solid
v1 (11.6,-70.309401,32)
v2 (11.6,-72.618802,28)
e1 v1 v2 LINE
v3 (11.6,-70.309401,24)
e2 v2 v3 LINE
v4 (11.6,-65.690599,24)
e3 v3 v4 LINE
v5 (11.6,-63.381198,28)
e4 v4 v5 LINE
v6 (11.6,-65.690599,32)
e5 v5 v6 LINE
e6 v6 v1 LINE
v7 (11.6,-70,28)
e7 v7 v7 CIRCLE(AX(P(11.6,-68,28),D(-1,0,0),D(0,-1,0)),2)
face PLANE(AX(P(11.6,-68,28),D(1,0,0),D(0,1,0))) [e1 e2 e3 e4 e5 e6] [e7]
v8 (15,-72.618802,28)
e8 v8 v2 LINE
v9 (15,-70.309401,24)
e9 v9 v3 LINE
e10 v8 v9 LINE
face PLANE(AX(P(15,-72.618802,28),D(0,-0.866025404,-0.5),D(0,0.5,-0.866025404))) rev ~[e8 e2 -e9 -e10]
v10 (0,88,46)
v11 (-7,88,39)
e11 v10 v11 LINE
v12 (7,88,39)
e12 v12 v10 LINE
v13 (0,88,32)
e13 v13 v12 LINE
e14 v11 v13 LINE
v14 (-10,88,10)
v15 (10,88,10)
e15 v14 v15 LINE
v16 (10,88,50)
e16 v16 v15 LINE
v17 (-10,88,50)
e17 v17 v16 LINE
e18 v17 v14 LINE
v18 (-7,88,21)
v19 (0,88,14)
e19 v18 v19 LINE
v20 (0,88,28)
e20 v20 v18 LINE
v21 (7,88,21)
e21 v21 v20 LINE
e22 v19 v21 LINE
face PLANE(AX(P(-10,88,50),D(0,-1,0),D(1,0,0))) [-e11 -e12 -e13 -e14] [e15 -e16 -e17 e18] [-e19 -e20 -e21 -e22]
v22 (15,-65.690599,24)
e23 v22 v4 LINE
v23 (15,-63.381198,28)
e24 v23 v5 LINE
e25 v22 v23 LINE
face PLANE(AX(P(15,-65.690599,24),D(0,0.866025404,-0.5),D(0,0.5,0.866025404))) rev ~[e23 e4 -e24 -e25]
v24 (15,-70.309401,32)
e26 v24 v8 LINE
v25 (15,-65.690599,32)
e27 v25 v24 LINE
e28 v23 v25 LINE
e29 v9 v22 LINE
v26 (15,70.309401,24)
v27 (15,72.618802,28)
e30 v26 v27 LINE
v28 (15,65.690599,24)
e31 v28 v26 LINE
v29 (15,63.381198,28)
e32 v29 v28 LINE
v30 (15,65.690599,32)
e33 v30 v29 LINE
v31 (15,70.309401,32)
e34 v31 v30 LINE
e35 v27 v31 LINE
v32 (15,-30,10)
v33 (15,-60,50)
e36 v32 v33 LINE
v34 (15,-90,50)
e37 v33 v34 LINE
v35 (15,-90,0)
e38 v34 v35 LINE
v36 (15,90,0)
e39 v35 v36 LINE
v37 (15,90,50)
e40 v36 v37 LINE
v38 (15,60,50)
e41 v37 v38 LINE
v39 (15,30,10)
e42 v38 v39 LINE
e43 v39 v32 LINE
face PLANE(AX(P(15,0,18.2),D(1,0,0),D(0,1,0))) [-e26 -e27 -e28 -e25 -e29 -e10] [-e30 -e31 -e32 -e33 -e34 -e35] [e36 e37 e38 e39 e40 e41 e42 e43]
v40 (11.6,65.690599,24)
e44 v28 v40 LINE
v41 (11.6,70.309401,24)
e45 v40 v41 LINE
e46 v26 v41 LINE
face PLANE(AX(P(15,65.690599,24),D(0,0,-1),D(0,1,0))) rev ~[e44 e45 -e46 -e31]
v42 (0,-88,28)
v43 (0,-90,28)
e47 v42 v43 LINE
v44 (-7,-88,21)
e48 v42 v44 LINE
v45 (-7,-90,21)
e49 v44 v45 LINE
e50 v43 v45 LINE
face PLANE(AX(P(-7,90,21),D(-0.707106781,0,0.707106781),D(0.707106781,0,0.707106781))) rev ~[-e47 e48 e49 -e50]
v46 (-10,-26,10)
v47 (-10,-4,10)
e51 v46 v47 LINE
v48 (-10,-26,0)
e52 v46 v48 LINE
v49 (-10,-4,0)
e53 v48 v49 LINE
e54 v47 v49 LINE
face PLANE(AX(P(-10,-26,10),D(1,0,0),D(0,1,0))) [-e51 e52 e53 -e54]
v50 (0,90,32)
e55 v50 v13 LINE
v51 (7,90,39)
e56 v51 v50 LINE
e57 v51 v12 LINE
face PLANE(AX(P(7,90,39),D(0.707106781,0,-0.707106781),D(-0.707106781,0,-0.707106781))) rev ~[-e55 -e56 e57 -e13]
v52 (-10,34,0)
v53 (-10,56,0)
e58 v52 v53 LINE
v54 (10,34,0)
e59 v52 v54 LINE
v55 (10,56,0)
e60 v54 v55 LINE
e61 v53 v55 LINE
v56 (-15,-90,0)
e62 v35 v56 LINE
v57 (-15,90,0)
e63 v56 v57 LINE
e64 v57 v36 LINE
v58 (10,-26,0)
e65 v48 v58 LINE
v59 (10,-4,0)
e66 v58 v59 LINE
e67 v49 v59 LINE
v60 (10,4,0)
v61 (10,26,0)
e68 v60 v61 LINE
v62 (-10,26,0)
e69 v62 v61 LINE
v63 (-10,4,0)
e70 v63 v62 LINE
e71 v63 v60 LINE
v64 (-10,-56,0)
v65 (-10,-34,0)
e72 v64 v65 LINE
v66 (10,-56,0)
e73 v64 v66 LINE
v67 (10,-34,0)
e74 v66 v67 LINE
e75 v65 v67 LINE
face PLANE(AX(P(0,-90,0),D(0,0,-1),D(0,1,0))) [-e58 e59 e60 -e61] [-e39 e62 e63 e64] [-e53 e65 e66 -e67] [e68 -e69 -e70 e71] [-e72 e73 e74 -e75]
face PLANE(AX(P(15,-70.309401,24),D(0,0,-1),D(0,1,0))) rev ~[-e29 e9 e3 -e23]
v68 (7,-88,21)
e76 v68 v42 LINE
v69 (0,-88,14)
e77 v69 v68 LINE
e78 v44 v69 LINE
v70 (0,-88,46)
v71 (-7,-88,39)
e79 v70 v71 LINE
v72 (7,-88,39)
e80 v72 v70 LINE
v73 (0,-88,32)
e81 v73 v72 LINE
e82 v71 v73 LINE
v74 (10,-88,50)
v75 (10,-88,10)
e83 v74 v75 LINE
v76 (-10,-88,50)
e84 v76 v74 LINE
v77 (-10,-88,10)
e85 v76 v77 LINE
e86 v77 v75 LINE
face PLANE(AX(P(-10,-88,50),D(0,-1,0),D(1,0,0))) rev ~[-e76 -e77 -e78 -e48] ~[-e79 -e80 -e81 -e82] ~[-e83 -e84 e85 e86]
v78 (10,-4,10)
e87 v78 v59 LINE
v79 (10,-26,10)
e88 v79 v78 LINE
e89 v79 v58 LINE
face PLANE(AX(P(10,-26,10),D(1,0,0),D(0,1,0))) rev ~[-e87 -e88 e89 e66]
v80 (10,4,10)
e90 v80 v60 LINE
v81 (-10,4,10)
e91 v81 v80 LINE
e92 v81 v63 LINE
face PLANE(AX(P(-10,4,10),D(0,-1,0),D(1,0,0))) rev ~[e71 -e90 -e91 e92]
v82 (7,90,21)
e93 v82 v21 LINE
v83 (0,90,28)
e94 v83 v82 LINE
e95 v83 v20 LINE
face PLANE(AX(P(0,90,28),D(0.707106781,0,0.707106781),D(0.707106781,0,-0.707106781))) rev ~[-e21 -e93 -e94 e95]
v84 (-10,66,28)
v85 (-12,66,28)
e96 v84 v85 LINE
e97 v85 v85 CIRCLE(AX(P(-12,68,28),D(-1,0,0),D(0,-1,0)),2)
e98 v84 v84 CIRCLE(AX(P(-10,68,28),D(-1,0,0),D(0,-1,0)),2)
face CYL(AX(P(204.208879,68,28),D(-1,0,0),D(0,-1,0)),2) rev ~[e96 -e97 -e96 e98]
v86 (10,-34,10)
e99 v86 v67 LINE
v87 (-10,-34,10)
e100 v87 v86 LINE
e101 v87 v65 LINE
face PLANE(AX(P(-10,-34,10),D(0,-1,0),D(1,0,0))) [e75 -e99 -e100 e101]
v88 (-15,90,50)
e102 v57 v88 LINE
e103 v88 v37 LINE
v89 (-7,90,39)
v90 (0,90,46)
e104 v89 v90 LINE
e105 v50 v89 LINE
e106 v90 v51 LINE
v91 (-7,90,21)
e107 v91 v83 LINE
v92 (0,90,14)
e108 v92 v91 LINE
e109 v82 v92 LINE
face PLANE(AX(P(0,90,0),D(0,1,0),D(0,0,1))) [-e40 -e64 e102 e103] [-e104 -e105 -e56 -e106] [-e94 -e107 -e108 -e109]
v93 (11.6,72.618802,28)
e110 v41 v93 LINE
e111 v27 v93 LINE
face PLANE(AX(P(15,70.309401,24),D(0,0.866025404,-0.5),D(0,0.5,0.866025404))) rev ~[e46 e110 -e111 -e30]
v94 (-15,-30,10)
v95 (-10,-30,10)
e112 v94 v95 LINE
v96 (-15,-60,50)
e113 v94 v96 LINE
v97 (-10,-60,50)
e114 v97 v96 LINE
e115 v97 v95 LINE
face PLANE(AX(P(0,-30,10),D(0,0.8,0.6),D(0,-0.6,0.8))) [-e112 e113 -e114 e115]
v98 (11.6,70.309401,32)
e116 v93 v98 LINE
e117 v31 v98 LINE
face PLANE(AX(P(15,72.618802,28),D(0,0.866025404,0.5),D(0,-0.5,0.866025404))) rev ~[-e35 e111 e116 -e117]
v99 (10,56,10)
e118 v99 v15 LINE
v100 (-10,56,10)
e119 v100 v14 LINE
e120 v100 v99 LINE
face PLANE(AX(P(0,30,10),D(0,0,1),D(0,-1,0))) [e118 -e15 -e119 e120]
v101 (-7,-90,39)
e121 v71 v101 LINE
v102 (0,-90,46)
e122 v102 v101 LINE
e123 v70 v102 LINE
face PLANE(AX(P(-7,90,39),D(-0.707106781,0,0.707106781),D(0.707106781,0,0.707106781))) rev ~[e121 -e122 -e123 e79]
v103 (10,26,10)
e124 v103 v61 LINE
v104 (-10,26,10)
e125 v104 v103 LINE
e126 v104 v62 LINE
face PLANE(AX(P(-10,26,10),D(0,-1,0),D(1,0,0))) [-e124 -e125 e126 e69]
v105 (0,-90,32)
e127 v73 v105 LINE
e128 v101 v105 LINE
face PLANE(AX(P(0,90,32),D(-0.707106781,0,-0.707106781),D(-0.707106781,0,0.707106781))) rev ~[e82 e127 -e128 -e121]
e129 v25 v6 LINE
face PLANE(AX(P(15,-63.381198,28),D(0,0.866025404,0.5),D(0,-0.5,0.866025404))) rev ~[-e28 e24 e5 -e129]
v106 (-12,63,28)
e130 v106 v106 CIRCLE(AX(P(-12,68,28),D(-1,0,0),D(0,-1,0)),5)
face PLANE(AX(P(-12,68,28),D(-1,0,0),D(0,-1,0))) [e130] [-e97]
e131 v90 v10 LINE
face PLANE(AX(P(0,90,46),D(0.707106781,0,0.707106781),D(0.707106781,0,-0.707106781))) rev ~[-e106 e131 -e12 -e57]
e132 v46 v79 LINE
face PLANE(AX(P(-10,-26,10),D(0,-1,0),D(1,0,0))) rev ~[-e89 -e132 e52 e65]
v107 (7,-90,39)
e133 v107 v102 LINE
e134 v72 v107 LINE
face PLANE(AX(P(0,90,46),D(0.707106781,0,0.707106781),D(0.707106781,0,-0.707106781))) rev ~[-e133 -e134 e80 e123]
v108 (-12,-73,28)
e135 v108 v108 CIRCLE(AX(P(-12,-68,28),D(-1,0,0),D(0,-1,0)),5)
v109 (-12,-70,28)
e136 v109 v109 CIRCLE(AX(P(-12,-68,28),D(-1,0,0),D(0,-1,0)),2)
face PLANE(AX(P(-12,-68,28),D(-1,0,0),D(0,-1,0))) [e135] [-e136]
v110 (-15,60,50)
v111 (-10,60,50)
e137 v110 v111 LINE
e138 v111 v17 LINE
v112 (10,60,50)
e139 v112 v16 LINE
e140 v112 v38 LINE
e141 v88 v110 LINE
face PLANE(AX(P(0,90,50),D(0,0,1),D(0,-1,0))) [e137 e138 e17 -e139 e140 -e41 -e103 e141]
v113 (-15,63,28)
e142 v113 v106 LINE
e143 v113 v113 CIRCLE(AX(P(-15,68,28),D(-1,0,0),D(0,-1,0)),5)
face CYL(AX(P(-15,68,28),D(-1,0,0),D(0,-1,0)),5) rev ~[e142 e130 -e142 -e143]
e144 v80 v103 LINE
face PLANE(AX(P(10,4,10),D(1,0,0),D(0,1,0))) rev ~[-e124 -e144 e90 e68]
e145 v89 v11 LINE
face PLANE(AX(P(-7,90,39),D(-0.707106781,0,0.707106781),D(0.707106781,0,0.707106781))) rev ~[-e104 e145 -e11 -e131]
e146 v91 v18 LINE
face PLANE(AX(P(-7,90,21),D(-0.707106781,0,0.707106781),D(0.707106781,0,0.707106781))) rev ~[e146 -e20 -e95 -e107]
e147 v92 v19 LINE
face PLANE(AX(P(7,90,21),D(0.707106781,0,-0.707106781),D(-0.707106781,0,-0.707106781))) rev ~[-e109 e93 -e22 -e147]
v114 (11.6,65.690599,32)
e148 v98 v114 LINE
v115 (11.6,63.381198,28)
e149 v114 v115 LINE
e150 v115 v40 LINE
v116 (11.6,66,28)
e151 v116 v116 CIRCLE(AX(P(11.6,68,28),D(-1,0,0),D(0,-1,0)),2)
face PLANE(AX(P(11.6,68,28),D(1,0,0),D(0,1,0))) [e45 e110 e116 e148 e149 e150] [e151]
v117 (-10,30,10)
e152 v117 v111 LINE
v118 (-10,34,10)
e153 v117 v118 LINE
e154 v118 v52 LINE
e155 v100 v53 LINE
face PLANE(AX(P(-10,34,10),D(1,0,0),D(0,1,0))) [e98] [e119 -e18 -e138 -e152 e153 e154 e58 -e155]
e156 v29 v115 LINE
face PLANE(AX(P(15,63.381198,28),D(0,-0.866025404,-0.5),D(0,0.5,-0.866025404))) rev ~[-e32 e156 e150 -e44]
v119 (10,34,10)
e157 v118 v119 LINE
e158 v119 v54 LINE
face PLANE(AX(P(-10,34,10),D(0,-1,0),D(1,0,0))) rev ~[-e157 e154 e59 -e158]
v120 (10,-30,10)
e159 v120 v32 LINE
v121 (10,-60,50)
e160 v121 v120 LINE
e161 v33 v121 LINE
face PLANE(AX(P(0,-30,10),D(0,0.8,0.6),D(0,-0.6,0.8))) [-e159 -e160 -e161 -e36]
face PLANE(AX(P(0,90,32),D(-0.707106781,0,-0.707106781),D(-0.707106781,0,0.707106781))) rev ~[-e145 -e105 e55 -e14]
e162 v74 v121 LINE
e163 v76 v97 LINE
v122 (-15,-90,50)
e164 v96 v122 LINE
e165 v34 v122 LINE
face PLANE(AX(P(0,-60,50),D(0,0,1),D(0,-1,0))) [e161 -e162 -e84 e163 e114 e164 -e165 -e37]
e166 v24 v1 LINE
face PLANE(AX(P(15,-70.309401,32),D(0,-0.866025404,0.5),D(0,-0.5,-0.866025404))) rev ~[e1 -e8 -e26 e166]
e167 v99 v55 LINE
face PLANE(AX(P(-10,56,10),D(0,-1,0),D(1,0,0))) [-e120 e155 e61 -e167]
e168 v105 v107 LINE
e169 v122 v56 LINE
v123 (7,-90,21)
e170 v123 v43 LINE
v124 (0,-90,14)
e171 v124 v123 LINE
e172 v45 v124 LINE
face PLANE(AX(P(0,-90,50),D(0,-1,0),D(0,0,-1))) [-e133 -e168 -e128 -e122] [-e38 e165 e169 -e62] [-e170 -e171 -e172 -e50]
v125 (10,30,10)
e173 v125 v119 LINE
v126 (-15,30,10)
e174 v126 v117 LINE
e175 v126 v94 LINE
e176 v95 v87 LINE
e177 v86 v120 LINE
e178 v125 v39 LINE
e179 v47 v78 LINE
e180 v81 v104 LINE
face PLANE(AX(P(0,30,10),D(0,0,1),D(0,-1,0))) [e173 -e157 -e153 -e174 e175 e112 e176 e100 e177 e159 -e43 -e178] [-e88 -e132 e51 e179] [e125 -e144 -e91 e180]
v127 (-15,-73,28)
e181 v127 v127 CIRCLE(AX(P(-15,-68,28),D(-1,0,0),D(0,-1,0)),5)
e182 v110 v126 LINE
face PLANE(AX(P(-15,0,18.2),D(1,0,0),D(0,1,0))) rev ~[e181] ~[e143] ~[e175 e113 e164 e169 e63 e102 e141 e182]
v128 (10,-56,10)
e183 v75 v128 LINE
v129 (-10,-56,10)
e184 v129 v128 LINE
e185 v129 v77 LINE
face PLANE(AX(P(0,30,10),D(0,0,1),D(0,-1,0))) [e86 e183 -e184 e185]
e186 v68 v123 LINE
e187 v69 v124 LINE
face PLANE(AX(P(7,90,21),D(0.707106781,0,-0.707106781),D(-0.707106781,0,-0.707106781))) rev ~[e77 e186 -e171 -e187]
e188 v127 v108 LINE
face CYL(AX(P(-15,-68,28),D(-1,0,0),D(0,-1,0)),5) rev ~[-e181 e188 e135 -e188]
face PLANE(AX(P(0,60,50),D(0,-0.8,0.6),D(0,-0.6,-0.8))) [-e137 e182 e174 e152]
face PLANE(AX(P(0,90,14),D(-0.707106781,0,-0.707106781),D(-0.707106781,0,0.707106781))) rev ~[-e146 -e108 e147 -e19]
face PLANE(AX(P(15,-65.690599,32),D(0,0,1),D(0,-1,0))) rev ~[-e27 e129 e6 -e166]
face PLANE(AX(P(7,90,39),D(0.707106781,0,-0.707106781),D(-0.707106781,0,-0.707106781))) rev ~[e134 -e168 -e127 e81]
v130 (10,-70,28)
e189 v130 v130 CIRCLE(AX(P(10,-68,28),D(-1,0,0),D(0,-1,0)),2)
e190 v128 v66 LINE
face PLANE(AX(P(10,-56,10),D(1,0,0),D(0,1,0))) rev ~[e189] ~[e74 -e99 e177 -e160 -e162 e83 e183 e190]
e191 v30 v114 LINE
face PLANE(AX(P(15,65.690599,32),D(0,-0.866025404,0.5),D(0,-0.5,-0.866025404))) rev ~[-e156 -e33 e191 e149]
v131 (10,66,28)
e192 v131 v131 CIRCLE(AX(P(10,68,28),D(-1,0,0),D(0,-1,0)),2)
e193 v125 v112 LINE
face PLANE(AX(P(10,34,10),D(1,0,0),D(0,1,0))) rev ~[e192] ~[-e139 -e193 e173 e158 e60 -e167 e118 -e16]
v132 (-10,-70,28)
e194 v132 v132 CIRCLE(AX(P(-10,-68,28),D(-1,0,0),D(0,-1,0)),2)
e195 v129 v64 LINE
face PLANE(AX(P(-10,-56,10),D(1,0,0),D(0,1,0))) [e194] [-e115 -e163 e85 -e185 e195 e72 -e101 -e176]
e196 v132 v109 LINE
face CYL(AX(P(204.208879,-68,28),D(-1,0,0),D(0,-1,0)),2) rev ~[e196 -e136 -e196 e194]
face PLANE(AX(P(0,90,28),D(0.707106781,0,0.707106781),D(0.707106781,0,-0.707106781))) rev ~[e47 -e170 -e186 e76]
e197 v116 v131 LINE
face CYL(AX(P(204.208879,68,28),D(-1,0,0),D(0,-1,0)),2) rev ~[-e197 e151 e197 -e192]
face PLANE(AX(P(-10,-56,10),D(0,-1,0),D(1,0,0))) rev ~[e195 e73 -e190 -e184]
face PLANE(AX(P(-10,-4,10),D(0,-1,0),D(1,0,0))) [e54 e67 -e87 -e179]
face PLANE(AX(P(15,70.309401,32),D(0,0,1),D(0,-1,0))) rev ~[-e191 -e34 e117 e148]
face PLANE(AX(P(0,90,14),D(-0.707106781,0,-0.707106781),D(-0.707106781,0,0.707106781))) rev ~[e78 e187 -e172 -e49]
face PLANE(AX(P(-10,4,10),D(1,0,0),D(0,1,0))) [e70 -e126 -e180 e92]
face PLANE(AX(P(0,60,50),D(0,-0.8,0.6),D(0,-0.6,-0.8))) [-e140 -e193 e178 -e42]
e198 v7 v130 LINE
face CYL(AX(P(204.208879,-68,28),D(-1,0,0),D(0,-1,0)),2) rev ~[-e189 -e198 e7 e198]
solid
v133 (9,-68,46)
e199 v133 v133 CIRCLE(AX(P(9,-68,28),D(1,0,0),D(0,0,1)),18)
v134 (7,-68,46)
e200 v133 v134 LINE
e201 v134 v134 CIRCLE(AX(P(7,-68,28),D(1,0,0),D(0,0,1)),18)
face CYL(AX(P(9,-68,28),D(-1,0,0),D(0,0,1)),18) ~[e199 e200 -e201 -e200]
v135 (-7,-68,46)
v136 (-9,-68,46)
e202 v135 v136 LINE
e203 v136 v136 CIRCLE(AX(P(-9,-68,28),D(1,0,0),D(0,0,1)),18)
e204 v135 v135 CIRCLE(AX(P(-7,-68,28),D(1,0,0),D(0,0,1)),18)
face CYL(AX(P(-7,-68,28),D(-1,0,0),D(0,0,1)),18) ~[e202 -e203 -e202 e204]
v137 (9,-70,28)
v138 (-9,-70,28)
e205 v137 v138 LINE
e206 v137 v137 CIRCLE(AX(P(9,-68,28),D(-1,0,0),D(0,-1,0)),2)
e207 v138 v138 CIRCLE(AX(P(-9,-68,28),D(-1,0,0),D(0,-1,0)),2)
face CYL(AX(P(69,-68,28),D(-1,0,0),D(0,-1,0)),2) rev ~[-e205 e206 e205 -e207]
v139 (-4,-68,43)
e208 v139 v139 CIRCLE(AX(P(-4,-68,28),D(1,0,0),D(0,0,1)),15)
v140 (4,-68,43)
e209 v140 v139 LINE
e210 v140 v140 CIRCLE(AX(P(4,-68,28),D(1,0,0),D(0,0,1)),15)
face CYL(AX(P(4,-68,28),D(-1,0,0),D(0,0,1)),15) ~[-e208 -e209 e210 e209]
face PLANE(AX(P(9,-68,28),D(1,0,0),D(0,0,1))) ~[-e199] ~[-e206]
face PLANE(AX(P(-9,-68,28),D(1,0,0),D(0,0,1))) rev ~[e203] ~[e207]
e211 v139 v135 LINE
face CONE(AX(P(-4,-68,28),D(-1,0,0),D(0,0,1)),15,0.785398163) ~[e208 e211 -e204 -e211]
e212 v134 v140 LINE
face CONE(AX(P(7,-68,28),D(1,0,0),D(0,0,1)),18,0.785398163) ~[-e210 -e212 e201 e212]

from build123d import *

# Parameters (mm, degrees)
F0_R      = 15
F1_DEPTH  = 15
F2_W      = 20
F2_H      = 30
F3_DEPTH  = 40
F2_H_2    = 58
F2_H_3    = 28
F4_DEPTH  = 40
F9_D      = 4
F9_2_D    = 4
F10_W     = 20
F10_H     = 22
F11_DEPTH = 10
F12_DEPTH = 3.4
F13_R     = 5
F14_DEPTH = 3
F16_DEPTH = 180.001


with BuildPart() as f1:
    # F0 (on Right) → F1 (new body, symmetric)
    with BuildSketch(Plane.YZ):
        Polygon((-90, 0), (0, 0), (90, 0), (90, 50), (60, 50), (30, 10), (0, 10), (-30, 10), (-60, 50), (-90, 50), align=None)
        with Locations((-68, 28)):
            Circle(F0_R, mode=Mode.SUBTRACT)
        with Locations((-68, 28)):
            Circle(F0_R)
    extrude(amount=F1_DEPTH, both=True)

    # F2 (on face) → F3 (cut, through all)
    with BuildSketch(Plane.XY.offset(50)):
        with Locations((0, -45)):
            Rectangle(F2_W, F2_H)
    extrude(amount=-F3_DEPTH, mode=Mode.SUBTRACT)

    # F2 (on face) → F4 (cut, through all)
    with BuildSketch(Plane.XY.offset(50)):
        with Locations((0, 59)):
            Rectangle(F2_W, F2_H_2)
        with Locations((0, -74)):
            Rectangle(F2_W, F2_H_3)
    extrude(amount=-F4_DEPTH, mode=Mode.SUBTRACT)

    # F9 (through all)
    with Locations(Plane.YZ.offset(15)):
        with Locations((-68, 28), (68, 28)):
            Hole(F9_D / 2)

    # F10 (on face) → F11 (cut, through all)
    with BuildSketch(Plane.XY.offset(10)):
        with Locations((0, 15)):
            Rectangle(F10_W, F10_H)
        with Locations((0, -15)):
            Rectangle(F10_W, F10_H)
        with Locations((0, -45)):
            Rectangle(F10_W, F10_H)
        with Locations((0, 45)):
            Rectangle(F10_W, F10_H)
    extrude(amount=-F11_DEPTH, mode=Mode.SUBTRACT)

    # F8 (on face) → F12 (cut, through all)
    with BuildSketch(Plane.YZ.offset(15)):
        Polygon((-70.3094010768, 24), (-65.6905989232, 24), (-63.3811978465, 28), (-65.6905989232, 32), (-70.3094010768, 32), (-72.6188021535, 28), align=None)
        Polygon((70.3094010768, 32), (65.6905989232, 32), (63.3811978465, 28), (65.6905989232, 24), (70.3094010768, 24), (72.6188021535, 28), align=None)
    extrude(amount=-F12_DEPTH, mode=Mode.SUBTRACT)

    # F13 (on face) → F14 (cut)
    with BuildSketch(Plane(origin=(-15, 0, 0), x_dir=(0, -1, 0), z_dir=(-1, 0, 0))):
        with Locations((68, 28)):
            Circle(F13_R)
        with Locations((-68, 28)):
            Circle(F13_R)
    extrude(amount=-F14_DEPTH, mode=Mode.SUBTRACT)

    # F15 (on face) → F16 (cut, through all)
    with BuildSketch(Plane(origin=(0, 90, 0), x_dir=(-1, 0, 0), z_dir=(0, 1, 0))):
        Polygon((-7, 39), (0, 32), (7, 39), (0, 46), align=None)
        Polygon((7, 21), (0, 28), (-7, 21), (0, 14), align=None)
    extrude(amount=-F16_DEPTH, mode=Mode.SUBTRACT)


with BuildPart() as f7:
    # F6 (on plane+point) → F7 (revolve)
    with BuildSketch(Plane.XZ.offset(68)):
        Polygon((4, 43), (0, 43), (-4, 43), (-7, 46), (-9, 46), (-9, 28), (0, 28), (9, 28), (9, 46), (7, 46), align=None)
    revolve(axis=Axis((-4.5, -68, 28), (1, 0, 0)))

    # F9#2 (through all)
    with Locations(Plane.YZ.offset(15)):
        with Locations((-68, 28), (68, 28)):
            Hole(F9_2_D / 2)


solid = Compound([f1.part, f7.part])
